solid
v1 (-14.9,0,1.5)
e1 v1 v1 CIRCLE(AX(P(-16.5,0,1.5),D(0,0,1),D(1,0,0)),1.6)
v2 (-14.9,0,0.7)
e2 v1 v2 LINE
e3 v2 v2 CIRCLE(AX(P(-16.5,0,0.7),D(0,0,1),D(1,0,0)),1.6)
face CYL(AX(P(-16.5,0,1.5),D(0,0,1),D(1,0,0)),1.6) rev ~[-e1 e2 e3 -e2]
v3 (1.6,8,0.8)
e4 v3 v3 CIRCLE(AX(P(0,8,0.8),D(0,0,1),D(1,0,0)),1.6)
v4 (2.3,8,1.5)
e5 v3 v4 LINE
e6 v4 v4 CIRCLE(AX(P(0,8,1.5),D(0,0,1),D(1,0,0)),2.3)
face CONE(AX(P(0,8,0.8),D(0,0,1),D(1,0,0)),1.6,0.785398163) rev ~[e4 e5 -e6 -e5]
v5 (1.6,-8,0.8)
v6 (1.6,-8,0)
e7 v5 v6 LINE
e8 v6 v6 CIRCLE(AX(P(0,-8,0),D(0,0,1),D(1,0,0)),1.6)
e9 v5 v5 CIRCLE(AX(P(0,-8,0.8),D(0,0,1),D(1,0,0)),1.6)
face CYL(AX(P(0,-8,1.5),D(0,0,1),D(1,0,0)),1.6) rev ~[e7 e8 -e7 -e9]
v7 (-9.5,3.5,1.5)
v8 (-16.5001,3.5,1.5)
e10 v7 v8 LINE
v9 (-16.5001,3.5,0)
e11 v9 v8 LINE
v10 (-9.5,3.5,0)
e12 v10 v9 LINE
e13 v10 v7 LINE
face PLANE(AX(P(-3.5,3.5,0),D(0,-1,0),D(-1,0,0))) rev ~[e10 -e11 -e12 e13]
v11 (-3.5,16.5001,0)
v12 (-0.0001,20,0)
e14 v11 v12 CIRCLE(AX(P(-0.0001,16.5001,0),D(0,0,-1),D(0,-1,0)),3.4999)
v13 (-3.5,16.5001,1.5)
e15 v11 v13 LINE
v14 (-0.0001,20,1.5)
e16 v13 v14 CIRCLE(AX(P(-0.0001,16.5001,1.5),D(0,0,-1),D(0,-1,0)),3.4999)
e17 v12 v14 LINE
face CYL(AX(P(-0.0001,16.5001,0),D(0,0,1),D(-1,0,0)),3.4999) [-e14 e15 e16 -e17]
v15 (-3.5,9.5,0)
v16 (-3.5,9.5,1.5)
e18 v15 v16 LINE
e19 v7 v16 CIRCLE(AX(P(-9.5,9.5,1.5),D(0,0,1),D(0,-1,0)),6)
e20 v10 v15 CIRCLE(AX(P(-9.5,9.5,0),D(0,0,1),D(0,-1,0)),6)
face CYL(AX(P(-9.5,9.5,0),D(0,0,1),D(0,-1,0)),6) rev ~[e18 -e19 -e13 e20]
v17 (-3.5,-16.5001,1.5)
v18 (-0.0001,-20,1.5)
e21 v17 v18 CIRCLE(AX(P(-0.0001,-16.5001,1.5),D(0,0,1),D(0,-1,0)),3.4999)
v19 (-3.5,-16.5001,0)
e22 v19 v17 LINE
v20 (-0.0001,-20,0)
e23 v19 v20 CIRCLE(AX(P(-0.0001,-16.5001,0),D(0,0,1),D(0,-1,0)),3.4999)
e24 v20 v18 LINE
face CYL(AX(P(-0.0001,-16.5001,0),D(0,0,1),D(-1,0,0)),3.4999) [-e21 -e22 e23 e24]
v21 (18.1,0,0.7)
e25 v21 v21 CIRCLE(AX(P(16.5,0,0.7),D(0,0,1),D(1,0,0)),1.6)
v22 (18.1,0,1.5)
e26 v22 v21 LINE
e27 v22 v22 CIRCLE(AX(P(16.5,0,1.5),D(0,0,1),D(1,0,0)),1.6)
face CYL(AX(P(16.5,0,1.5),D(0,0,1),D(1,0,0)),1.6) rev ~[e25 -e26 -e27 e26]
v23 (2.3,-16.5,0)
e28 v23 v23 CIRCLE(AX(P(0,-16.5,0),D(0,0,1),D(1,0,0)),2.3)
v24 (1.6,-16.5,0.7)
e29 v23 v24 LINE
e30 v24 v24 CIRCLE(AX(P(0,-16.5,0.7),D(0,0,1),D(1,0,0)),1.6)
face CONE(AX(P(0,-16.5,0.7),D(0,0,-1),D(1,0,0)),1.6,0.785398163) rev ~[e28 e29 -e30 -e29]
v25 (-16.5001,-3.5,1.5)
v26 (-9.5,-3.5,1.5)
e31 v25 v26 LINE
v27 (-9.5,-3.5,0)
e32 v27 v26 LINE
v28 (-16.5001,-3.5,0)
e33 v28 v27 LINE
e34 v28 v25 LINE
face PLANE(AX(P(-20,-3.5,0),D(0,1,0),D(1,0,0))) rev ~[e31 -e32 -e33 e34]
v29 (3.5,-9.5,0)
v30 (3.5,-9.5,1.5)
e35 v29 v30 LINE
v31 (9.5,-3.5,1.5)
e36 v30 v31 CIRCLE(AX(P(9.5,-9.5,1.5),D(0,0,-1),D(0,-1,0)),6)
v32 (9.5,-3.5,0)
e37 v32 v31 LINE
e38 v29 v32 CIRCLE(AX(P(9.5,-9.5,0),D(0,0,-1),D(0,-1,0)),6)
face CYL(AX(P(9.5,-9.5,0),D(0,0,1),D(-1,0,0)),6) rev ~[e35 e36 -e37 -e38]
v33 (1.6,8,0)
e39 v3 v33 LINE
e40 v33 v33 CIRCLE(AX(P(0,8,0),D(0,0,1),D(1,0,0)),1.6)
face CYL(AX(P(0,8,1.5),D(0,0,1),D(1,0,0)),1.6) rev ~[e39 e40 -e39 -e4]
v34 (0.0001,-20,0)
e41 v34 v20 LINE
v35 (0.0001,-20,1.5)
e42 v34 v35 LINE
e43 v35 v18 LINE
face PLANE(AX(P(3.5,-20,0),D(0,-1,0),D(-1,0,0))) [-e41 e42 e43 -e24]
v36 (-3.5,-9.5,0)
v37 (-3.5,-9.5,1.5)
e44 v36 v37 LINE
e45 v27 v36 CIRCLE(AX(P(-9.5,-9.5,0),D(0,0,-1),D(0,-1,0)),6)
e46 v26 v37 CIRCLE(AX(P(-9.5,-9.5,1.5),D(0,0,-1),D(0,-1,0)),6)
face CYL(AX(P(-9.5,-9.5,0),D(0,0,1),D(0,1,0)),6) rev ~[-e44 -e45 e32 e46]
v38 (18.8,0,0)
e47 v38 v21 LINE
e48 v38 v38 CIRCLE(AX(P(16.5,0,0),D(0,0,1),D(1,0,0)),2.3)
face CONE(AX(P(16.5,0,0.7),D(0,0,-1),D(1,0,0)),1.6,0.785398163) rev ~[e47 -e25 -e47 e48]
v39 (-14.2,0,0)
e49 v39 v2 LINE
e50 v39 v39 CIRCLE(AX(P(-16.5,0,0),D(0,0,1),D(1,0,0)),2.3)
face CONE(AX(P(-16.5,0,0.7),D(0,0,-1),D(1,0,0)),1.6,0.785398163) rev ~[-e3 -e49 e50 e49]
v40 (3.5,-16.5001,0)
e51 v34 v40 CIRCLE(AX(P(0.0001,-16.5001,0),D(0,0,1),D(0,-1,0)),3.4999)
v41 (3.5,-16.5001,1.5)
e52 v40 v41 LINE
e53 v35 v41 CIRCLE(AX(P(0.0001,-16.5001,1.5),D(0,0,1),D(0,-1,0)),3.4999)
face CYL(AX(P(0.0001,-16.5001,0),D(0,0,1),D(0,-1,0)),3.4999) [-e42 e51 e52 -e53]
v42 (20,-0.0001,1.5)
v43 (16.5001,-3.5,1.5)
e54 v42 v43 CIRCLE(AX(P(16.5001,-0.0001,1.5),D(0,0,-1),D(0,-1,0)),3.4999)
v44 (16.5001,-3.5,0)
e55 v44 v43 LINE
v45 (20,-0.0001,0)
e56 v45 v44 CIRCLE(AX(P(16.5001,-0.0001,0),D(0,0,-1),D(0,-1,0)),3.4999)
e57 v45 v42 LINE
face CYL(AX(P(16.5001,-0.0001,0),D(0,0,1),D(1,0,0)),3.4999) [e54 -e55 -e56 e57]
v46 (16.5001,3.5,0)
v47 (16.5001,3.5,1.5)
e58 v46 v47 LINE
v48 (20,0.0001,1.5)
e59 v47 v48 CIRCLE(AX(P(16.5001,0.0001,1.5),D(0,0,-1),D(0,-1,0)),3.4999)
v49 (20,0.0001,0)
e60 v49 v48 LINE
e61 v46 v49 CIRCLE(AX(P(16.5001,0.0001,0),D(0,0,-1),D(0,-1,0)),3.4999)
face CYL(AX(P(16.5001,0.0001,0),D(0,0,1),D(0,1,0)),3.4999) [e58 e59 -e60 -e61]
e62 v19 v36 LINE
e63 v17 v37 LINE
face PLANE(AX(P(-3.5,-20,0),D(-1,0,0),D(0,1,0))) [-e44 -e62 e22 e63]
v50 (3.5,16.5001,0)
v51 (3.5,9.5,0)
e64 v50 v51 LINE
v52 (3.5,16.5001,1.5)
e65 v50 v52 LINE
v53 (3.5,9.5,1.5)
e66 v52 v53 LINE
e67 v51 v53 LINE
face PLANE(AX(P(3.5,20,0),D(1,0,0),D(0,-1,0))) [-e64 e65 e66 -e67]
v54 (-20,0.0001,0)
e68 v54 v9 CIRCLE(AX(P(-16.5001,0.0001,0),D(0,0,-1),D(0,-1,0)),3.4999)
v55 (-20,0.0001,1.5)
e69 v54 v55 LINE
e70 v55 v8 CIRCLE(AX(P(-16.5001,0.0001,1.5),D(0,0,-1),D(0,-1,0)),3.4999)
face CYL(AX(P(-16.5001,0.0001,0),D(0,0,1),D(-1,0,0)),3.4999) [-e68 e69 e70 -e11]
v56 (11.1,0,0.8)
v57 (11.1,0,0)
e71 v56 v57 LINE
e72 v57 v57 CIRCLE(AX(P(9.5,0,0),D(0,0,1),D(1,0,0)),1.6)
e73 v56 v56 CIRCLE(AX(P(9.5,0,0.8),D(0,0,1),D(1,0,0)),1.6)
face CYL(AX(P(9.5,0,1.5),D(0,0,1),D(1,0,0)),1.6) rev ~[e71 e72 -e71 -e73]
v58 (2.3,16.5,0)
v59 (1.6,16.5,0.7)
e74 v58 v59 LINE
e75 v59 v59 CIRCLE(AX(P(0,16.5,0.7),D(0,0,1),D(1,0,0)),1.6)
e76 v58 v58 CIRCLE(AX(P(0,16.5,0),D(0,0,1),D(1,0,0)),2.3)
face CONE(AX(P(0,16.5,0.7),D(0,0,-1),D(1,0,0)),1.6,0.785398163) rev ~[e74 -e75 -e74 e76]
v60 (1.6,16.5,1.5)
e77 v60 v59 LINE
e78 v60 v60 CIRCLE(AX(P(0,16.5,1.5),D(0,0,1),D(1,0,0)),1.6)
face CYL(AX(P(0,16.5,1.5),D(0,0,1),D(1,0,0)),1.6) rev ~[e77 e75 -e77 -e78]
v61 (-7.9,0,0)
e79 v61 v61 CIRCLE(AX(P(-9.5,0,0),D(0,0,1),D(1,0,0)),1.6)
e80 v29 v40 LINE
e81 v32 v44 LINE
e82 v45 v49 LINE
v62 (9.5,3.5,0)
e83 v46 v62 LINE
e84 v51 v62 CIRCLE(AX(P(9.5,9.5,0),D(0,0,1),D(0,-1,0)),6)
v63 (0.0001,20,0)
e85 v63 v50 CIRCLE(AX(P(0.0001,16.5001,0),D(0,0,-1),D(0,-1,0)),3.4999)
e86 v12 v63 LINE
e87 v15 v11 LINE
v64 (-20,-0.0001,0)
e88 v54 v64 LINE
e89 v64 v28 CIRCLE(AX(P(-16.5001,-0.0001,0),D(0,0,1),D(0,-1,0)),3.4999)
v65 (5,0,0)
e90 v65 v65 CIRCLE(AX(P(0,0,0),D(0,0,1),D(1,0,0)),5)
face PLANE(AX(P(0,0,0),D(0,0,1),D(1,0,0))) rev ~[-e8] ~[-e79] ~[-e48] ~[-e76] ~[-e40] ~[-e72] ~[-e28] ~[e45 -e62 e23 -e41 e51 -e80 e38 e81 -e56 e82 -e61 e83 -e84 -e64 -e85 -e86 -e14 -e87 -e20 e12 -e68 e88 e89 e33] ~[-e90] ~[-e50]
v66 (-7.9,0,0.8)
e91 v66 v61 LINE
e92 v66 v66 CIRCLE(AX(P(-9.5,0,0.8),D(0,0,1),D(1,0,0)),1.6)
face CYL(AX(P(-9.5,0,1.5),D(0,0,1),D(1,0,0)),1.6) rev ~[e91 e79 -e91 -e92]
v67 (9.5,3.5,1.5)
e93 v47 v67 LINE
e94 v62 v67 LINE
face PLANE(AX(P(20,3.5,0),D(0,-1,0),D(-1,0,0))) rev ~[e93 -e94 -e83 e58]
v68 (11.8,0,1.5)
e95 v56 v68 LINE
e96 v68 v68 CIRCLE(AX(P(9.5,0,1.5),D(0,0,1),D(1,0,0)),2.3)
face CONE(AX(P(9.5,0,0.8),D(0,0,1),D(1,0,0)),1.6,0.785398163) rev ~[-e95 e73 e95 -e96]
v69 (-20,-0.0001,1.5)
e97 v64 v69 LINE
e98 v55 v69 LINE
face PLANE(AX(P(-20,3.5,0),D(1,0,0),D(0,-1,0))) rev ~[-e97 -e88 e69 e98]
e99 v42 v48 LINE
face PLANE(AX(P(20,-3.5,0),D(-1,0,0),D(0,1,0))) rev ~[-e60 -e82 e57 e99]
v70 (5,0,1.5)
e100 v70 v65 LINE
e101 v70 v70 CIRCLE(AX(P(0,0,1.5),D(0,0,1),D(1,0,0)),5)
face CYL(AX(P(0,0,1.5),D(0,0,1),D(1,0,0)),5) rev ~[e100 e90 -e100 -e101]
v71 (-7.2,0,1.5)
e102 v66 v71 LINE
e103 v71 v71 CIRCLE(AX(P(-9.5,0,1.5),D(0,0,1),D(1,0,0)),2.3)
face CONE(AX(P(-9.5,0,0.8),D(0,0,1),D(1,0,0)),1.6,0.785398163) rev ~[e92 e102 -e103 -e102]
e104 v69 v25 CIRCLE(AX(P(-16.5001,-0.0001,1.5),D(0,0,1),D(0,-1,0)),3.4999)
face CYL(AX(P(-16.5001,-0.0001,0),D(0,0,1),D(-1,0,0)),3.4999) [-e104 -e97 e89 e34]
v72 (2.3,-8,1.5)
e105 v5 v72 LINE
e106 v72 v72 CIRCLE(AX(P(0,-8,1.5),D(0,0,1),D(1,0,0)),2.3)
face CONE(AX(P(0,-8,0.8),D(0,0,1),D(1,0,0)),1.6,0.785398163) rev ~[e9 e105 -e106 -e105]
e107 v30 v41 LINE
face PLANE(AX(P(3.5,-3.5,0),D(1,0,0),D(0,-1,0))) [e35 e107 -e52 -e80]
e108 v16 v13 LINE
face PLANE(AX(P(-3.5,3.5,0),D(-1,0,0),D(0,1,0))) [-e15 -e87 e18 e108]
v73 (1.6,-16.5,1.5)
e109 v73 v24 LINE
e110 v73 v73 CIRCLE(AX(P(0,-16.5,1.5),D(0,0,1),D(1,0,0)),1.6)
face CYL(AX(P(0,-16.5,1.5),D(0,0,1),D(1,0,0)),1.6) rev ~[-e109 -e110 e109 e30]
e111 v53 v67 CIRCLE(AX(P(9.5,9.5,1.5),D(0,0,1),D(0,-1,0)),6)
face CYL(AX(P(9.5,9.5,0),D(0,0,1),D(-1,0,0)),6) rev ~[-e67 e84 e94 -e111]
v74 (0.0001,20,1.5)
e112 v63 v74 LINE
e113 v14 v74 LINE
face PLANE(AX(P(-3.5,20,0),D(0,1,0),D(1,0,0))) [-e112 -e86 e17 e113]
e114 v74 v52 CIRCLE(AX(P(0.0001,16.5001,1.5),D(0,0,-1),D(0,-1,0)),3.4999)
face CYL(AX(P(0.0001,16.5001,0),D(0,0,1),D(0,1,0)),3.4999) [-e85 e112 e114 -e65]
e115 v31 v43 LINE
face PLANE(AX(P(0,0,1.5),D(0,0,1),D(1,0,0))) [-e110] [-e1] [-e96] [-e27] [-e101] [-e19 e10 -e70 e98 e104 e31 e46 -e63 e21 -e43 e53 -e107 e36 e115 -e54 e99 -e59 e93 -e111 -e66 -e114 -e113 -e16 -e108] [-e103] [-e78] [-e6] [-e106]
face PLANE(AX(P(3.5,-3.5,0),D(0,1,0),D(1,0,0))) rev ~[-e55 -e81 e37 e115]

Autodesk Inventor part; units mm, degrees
ref_plane "YZ Plane" through (0, 0, 0) normal (1, 0, 0) x (0, 1, 0)
ref_plane "XZ Plane" through (0, 0, 0) normal (0, 1, 0) x (-1, 0, 0)
ref_plane "XY Plane" through (0, 0, 0) normal (0, 0, 1) x (1, 0, 0)
sketch "Skizze1" plane through (0, 0, 0) normal (0, 0, 1) x (1, 0, 0)
  line L0 (-20, -3.5) -> (20, -3.5)
  line L1 (20, -3.5) -> (20, 3.5)
  line L2 (20, 3.5) -> (-20, 3.5)
  line L3 (-20, 3.5) -> (-20, -3.5)
  line L4 (-20, -3.5) -> (20, 3.5) construction
  line L5 (20, -3.5) -> (-20, 3.5) construction
  line L6 (3.5, -20) -> (-3.5, -20)
  line L7 (-3.5, -20) -> (-3.5, 20)
  line L8 (-3.5, 20) -> (3.5, 20)
  line L9 (3.5, 20) -> (3.5, -20)
  line L10 (3.5, -20) -> (-3.5, 20) construction
  line L11 (-3.5, -20) -> (3.5, 20) construction
  point P0 (0, 0)
  dimension "d0" = 7
  dimension "d1" = 40
extrude "Extrusion1" add sketch "Skizze1" along normal blind 1.5
fillet "Rundung1" radius 3.5 8 edges at (3.5, 20, 0.75) (-3.5, 20, 0.75) (20, 3.5, 0.75) (20, -3.5, 0.75) (3.5, -20, 0.75) (-3.5, -20, 0.75) (-20, -3.5, 0.75) (-20, 3.5, 0.75)
fillet "Rundung2" radius 6 4 edges at (3.5, 3.5, 0.75) (-3.5, 3.5, 0.75) (-3.5, -3.5, 0.75) (3.5, -3.5, 0.75)
sketch "Skizze2" plane through (0, 0, 1.5) normal (0, 0, 1) x (1, 0, 0)
  circle A0 centre (0, 0) radius 5
  circle A1 centre (16.5, 0) radius 1.6
  circle A2 centre (-16.5, 0) radius 1.6
  circle A3 centre (0, 16.5) radius 1.6
  circle A4 centre (0, -16.5) radius 1.6
  circle A5 centre (0, -8) radius 1.6
  circle A6 centre (0, 8) radius 1.6
  circle A7 centre (-9.5, 0) radius 1.6
  circle A8 centre (9.5, 0) radius 1.6
  line L0 (0, 16.5) -> (0, -16.5) construction
  line L1 (-16.5, 0) -> (16.5, 0) construction
  line L2 (9.5, 0) -> (-9.5, 0) construction
  line L3 (0, 8) -> (0, -8) construction
  dimension "d6" = 3.2
  dimension "d7" = 10
  dimension "d8" = 33
  dimension "d9" = 19
  dimension "d10" = 16
extrude "Extrusion2" cut sketch "Skizze2" against normal blind 1.5
chamfer "Fase1" distance 0.7 angle 45 4 edges at (-1.6, -8, 1.5) (-11.1, 0, 1.5) (-1.6, 8, 1.5) (7.9, 0, 1.5)
chamfer "Fase2" distance 0.7 angle 45 4 edges at (-1.6, 16.5, 0) (-18.1, 0, 0) (-1.6, -16.5, 0) (14.9, 0, 0)
equation "\"G_L\" = 0"
equation "\"G_H\" = 0"
equation "\"G_B\" = 0"
properties part number "Motorkreuz_klein" material "GEDA Stahl"
